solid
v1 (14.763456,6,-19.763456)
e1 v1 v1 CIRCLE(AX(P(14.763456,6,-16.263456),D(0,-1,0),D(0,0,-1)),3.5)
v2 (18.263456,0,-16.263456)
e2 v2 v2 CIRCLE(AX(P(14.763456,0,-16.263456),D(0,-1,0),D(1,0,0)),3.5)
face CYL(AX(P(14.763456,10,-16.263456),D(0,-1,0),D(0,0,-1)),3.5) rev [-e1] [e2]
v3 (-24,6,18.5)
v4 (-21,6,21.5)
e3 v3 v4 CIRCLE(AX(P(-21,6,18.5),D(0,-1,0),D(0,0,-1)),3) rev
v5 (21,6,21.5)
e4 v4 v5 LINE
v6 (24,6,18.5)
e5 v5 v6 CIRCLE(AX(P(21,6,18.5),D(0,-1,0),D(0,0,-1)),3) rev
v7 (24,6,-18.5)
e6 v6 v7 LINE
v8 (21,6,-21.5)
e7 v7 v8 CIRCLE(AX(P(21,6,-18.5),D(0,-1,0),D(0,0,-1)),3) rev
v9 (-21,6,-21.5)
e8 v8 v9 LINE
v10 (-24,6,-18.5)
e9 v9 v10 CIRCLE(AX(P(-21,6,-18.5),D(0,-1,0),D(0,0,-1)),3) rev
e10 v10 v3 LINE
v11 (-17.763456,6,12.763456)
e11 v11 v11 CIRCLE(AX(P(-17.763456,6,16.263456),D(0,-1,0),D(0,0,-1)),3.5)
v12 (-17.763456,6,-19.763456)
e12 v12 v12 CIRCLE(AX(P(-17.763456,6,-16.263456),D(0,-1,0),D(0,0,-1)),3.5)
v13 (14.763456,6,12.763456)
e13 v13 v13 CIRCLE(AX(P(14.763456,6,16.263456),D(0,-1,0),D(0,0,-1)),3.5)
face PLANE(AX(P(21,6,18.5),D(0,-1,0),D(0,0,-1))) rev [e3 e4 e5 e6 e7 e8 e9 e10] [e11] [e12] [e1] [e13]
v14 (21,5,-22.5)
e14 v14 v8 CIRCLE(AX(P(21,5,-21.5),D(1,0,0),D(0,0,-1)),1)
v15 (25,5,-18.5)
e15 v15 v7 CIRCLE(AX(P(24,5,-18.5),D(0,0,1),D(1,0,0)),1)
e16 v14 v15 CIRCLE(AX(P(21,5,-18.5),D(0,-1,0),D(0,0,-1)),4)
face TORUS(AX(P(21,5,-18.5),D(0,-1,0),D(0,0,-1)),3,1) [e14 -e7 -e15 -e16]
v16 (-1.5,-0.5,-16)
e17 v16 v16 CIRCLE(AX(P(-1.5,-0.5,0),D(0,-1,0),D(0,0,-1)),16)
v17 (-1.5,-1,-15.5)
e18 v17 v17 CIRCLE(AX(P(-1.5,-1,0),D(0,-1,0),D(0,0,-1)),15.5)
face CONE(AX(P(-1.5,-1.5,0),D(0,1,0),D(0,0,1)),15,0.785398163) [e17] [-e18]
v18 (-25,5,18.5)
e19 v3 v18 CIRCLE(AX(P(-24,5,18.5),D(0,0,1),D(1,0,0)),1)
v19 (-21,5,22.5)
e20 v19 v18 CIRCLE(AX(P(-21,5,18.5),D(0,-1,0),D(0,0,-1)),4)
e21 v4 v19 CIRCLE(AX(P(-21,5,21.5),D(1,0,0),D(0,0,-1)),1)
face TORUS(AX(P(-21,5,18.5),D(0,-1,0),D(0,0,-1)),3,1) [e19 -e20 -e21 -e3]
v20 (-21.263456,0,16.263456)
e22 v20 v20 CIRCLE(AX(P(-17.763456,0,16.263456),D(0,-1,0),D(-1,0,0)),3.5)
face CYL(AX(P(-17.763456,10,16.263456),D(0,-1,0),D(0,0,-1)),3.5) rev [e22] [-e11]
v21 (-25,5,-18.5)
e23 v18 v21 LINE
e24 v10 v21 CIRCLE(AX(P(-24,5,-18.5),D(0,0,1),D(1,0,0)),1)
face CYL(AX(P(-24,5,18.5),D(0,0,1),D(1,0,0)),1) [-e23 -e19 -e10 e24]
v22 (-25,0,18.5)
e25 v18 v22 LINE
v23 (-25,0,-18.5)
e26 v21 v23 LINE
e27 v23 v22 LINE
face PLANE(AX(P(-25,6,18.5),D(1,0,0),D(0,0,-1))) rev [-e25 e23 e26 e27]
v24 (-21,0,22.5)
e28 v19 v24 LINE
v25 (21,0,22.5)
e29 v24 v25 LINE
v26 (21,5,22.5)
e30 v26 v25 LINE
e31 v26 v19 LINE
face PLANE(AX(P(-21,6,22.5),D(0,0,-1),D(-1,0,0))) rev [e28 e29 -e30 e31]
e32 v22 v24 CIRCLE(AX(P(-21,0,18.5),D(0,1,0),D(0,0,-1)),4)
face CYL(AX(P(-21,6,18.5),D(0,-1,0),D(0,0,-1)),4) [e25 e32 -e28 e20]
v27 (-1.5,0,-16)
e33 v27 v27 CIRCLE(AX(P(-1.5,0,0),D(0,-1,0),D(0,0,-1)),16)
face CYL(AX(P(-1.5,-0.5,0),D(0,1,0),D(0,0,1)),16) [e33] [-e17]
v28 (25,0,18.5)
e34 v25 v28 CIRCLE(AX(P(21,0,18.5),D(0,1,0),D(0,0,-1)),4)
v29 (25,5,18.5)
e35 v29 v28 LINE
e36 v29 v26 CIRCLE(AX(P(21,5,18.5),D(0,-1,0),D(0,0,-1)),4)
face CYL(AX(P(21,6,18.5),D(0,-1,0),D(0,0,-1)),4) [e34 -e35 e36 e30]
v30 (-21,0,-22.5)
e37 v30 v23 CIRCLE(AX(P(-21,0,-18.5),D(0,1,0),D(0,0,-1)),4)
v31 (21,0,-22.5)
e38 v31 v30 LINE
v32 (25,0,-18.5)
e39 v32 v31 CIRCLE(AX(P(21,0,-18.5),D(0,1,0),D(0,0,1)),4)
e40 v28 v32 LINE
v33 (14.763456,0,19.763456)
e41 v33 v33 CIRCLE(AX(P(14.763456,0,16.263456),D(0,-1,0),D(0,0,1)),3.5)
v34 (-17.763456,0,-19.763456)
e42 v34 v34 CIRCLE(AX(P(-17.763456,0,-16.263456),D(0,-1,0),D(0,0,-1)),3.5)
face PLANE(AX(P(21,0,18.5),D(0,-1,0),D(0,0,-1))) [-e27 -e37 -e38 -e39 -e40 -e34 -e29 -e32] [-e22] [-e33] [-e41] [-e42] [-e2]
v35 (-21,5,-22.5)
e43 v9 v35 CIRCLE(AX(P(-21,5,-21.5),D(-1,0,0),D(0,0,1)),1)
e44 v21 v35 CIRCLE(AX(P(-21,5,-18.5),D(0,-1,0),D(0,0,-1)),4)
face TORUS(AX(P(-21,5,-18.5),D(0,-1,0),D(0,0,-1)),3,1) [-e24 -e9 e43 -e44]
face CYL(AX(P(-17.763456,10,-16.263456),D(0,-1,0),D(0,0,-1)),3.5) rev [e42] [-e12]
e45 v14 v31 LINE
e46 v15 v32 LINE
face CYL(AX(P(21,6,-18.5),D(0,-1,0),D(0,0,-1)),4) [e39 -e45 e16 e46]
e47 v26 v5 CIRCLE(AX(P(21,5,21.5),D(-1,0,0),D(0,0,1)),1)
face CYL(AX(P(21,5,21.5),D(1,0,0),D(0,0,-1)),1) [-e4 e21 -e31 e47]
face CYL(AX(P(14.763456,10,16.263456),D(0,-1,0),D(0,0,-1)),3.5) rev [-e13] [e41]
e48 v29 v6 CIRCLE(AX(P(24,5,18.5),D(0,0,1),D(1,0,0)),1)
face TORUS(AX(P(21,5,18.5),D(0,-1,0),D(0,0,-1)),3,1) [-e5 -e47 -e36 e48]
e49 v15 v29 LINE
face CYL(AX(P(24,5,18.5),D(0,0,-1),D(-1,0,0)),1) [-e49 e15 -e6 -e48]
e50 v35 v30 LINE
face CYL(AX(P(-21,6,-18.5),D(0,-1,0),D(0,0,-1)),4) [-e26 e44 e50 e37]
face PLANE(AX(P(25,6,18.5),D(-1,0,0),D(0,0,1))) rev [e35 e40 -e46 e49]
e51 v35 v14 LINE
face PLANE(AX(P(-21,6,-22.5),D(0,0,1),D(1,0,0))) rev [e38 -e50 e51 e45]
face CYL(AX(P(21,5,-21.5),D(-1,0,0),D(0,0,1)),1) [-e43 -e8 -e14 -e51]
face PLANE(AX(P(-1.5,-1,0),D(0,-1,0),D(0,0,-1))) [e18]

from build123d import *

# Parameters (mm, degrees)
BOSS_EXTRUDE1_DEPTH = 6
FILLET1_R           = 1
SKETCH2_R           = 16
BOSS_EXTRUDE2_DEPTH = 0.5
SKETCH3_R           = 15
BOSS_EXTRUDE3_DEPTH = 0.5
FILLET2_SIZE        = 1
SKETCH5_R           = 3.5
CUT_EXTRUDE2_DEPTH  = 10
CIRPATTERN2_COUNT   = 4


with BuildPart() as part:
    # Sketch1 → Boss-Extrude1 (new body)
    with BuildSketch(Plane(origin=(0, 0, 0), x_dir=(1, 0, 0), z_dir=(0, 1, 0))):
        with BuildLine():
            Line((-21, -22.5), (21, -22.5))
            ThreePointArc((21, -22.5), (23.828427125, -21.328427125), (25, -18.5))
            Line((25, -18.5), (25, 18.5))
            ThreePointArc((25, 18.5), (23.828427125, 21.328427125), (21, 22.5))
            Line((21, 22.5), (-21, 22.5))
            ThreePointArc((-21, 22.5), (-23.828427125, 21.328427125), (-25, 18.5))
            Line((-25, 18.5), (-25, -18.5))
            ThreePointArc((-25, -18.5), (-23.828427125, -21.328427125), (-21, -22.5))
        make_face()
    extrude(amount=BOSS_EXTRUDE1_DEPTH)

    # Fillet1
    fillet1_edges = [part.edges().sort_by_distance(p)[0] for p in [
        (23.828427125, 6, -21.328427125),
        (0, 6, -22.5),
        (-23.828427125, 6, -21.328427125),
        (-25, 6, 0),
        (-23.828427125, 6, 21.328427125),
        (0, 6, 22.5),
        (23.828427125, 6, 21.328427125),
        (25, 6, 0),
    ]]
    fillet(fillet1_edges, radius=FILLET1_R)

    # Sketch2 → Boss-Extrude2 (add)
    with BuildSketch(Plane.XZ):
        with Locations(Location((-1.5, 0, 0), (0, 0, 270))):
            Circle(SKETCH2_R)
    extrude(amount=BOSS_EXTRUDE2_DEPTH)

    # Sketch3 → Boss-Extrude3 (add)
    with BuildSketch(Plane(origin=(0, -0.5, 0), x_dir=(-1, 0, 0), z_dir=(0, -1, 0))):
        with Locations(Location((1.5, 0, 0), (0, 0, 90))):
            Circle(SKETCH3_R)
    extrude(amount=BOSS_EXTRUDE3_DEPTH)

    # Fillet2
    # the kernel refuses this chamfer: 1 mm, written as the material it adds along each edge
    with BuildSketch(Plane(origin=(-1.5, -0.5, 0), x_dir=(0, 0, -1), z_dir=(-1, 0, 0))) as fillet2_piece_1_section:
        Polygon((15 + FILLET2_SIZE, 0), (15, FILLET2_SIZE), (15, 0), align=None)
    fillet2_piece_1 = revolve(axis=Axis((-1.5, -0.5, 0), (0, -1, 0)), mode=Mode.PRIVATE)
    fillet2_piece_1 = fillet2_piece_1 & Plane(origin=(-1.5, -0.725925615, 0), x_dir=(0, 0, -1), z_dir=(0, 1, 0)) * Cylinder(16, 64, mode=Mode.PRIVATE)
    fillet2_piece_1 = split(fillet2_piece_1, bisect_by=Plane(origin=(-1.5, -1, 15.725925615), z_dir=(0, 1, 0)), keep=Keep.TOP, mode=Mode.PRIVATE)
    add(fillet2_piece_1)

    # Sketch5 → Cut-Extrude2 (cut)
    with BuildSketch(Plane(origin=(0, 0, 0), x_dir=(-1, 0, 0), z_dir=(0, -1, 0))):
        with Locations(Location((17.763455967, 16.263455967, 0), (0, 0, 90))):
            Circle(SKETCH5_R)
    cut_extrude2 = extrude(amount=-CUT_EXTRUDE2_DEPTH, mode=Mode.SUBTRACT)

    # CirPattern2: Cut-Extrude2 ×4 about axis
    cirpattern2_axis = Axis((-1.5, 0, 0), (0, 1, 0))
    for i in range(1, CIRPATTERN2_COUNT):
        add(cut_extrude2.rotate(cirpattern2_axis, i * 360 / CIRPATTERN2_COUNT), mode=Mode.SUBTRACT)


solid = part.part
